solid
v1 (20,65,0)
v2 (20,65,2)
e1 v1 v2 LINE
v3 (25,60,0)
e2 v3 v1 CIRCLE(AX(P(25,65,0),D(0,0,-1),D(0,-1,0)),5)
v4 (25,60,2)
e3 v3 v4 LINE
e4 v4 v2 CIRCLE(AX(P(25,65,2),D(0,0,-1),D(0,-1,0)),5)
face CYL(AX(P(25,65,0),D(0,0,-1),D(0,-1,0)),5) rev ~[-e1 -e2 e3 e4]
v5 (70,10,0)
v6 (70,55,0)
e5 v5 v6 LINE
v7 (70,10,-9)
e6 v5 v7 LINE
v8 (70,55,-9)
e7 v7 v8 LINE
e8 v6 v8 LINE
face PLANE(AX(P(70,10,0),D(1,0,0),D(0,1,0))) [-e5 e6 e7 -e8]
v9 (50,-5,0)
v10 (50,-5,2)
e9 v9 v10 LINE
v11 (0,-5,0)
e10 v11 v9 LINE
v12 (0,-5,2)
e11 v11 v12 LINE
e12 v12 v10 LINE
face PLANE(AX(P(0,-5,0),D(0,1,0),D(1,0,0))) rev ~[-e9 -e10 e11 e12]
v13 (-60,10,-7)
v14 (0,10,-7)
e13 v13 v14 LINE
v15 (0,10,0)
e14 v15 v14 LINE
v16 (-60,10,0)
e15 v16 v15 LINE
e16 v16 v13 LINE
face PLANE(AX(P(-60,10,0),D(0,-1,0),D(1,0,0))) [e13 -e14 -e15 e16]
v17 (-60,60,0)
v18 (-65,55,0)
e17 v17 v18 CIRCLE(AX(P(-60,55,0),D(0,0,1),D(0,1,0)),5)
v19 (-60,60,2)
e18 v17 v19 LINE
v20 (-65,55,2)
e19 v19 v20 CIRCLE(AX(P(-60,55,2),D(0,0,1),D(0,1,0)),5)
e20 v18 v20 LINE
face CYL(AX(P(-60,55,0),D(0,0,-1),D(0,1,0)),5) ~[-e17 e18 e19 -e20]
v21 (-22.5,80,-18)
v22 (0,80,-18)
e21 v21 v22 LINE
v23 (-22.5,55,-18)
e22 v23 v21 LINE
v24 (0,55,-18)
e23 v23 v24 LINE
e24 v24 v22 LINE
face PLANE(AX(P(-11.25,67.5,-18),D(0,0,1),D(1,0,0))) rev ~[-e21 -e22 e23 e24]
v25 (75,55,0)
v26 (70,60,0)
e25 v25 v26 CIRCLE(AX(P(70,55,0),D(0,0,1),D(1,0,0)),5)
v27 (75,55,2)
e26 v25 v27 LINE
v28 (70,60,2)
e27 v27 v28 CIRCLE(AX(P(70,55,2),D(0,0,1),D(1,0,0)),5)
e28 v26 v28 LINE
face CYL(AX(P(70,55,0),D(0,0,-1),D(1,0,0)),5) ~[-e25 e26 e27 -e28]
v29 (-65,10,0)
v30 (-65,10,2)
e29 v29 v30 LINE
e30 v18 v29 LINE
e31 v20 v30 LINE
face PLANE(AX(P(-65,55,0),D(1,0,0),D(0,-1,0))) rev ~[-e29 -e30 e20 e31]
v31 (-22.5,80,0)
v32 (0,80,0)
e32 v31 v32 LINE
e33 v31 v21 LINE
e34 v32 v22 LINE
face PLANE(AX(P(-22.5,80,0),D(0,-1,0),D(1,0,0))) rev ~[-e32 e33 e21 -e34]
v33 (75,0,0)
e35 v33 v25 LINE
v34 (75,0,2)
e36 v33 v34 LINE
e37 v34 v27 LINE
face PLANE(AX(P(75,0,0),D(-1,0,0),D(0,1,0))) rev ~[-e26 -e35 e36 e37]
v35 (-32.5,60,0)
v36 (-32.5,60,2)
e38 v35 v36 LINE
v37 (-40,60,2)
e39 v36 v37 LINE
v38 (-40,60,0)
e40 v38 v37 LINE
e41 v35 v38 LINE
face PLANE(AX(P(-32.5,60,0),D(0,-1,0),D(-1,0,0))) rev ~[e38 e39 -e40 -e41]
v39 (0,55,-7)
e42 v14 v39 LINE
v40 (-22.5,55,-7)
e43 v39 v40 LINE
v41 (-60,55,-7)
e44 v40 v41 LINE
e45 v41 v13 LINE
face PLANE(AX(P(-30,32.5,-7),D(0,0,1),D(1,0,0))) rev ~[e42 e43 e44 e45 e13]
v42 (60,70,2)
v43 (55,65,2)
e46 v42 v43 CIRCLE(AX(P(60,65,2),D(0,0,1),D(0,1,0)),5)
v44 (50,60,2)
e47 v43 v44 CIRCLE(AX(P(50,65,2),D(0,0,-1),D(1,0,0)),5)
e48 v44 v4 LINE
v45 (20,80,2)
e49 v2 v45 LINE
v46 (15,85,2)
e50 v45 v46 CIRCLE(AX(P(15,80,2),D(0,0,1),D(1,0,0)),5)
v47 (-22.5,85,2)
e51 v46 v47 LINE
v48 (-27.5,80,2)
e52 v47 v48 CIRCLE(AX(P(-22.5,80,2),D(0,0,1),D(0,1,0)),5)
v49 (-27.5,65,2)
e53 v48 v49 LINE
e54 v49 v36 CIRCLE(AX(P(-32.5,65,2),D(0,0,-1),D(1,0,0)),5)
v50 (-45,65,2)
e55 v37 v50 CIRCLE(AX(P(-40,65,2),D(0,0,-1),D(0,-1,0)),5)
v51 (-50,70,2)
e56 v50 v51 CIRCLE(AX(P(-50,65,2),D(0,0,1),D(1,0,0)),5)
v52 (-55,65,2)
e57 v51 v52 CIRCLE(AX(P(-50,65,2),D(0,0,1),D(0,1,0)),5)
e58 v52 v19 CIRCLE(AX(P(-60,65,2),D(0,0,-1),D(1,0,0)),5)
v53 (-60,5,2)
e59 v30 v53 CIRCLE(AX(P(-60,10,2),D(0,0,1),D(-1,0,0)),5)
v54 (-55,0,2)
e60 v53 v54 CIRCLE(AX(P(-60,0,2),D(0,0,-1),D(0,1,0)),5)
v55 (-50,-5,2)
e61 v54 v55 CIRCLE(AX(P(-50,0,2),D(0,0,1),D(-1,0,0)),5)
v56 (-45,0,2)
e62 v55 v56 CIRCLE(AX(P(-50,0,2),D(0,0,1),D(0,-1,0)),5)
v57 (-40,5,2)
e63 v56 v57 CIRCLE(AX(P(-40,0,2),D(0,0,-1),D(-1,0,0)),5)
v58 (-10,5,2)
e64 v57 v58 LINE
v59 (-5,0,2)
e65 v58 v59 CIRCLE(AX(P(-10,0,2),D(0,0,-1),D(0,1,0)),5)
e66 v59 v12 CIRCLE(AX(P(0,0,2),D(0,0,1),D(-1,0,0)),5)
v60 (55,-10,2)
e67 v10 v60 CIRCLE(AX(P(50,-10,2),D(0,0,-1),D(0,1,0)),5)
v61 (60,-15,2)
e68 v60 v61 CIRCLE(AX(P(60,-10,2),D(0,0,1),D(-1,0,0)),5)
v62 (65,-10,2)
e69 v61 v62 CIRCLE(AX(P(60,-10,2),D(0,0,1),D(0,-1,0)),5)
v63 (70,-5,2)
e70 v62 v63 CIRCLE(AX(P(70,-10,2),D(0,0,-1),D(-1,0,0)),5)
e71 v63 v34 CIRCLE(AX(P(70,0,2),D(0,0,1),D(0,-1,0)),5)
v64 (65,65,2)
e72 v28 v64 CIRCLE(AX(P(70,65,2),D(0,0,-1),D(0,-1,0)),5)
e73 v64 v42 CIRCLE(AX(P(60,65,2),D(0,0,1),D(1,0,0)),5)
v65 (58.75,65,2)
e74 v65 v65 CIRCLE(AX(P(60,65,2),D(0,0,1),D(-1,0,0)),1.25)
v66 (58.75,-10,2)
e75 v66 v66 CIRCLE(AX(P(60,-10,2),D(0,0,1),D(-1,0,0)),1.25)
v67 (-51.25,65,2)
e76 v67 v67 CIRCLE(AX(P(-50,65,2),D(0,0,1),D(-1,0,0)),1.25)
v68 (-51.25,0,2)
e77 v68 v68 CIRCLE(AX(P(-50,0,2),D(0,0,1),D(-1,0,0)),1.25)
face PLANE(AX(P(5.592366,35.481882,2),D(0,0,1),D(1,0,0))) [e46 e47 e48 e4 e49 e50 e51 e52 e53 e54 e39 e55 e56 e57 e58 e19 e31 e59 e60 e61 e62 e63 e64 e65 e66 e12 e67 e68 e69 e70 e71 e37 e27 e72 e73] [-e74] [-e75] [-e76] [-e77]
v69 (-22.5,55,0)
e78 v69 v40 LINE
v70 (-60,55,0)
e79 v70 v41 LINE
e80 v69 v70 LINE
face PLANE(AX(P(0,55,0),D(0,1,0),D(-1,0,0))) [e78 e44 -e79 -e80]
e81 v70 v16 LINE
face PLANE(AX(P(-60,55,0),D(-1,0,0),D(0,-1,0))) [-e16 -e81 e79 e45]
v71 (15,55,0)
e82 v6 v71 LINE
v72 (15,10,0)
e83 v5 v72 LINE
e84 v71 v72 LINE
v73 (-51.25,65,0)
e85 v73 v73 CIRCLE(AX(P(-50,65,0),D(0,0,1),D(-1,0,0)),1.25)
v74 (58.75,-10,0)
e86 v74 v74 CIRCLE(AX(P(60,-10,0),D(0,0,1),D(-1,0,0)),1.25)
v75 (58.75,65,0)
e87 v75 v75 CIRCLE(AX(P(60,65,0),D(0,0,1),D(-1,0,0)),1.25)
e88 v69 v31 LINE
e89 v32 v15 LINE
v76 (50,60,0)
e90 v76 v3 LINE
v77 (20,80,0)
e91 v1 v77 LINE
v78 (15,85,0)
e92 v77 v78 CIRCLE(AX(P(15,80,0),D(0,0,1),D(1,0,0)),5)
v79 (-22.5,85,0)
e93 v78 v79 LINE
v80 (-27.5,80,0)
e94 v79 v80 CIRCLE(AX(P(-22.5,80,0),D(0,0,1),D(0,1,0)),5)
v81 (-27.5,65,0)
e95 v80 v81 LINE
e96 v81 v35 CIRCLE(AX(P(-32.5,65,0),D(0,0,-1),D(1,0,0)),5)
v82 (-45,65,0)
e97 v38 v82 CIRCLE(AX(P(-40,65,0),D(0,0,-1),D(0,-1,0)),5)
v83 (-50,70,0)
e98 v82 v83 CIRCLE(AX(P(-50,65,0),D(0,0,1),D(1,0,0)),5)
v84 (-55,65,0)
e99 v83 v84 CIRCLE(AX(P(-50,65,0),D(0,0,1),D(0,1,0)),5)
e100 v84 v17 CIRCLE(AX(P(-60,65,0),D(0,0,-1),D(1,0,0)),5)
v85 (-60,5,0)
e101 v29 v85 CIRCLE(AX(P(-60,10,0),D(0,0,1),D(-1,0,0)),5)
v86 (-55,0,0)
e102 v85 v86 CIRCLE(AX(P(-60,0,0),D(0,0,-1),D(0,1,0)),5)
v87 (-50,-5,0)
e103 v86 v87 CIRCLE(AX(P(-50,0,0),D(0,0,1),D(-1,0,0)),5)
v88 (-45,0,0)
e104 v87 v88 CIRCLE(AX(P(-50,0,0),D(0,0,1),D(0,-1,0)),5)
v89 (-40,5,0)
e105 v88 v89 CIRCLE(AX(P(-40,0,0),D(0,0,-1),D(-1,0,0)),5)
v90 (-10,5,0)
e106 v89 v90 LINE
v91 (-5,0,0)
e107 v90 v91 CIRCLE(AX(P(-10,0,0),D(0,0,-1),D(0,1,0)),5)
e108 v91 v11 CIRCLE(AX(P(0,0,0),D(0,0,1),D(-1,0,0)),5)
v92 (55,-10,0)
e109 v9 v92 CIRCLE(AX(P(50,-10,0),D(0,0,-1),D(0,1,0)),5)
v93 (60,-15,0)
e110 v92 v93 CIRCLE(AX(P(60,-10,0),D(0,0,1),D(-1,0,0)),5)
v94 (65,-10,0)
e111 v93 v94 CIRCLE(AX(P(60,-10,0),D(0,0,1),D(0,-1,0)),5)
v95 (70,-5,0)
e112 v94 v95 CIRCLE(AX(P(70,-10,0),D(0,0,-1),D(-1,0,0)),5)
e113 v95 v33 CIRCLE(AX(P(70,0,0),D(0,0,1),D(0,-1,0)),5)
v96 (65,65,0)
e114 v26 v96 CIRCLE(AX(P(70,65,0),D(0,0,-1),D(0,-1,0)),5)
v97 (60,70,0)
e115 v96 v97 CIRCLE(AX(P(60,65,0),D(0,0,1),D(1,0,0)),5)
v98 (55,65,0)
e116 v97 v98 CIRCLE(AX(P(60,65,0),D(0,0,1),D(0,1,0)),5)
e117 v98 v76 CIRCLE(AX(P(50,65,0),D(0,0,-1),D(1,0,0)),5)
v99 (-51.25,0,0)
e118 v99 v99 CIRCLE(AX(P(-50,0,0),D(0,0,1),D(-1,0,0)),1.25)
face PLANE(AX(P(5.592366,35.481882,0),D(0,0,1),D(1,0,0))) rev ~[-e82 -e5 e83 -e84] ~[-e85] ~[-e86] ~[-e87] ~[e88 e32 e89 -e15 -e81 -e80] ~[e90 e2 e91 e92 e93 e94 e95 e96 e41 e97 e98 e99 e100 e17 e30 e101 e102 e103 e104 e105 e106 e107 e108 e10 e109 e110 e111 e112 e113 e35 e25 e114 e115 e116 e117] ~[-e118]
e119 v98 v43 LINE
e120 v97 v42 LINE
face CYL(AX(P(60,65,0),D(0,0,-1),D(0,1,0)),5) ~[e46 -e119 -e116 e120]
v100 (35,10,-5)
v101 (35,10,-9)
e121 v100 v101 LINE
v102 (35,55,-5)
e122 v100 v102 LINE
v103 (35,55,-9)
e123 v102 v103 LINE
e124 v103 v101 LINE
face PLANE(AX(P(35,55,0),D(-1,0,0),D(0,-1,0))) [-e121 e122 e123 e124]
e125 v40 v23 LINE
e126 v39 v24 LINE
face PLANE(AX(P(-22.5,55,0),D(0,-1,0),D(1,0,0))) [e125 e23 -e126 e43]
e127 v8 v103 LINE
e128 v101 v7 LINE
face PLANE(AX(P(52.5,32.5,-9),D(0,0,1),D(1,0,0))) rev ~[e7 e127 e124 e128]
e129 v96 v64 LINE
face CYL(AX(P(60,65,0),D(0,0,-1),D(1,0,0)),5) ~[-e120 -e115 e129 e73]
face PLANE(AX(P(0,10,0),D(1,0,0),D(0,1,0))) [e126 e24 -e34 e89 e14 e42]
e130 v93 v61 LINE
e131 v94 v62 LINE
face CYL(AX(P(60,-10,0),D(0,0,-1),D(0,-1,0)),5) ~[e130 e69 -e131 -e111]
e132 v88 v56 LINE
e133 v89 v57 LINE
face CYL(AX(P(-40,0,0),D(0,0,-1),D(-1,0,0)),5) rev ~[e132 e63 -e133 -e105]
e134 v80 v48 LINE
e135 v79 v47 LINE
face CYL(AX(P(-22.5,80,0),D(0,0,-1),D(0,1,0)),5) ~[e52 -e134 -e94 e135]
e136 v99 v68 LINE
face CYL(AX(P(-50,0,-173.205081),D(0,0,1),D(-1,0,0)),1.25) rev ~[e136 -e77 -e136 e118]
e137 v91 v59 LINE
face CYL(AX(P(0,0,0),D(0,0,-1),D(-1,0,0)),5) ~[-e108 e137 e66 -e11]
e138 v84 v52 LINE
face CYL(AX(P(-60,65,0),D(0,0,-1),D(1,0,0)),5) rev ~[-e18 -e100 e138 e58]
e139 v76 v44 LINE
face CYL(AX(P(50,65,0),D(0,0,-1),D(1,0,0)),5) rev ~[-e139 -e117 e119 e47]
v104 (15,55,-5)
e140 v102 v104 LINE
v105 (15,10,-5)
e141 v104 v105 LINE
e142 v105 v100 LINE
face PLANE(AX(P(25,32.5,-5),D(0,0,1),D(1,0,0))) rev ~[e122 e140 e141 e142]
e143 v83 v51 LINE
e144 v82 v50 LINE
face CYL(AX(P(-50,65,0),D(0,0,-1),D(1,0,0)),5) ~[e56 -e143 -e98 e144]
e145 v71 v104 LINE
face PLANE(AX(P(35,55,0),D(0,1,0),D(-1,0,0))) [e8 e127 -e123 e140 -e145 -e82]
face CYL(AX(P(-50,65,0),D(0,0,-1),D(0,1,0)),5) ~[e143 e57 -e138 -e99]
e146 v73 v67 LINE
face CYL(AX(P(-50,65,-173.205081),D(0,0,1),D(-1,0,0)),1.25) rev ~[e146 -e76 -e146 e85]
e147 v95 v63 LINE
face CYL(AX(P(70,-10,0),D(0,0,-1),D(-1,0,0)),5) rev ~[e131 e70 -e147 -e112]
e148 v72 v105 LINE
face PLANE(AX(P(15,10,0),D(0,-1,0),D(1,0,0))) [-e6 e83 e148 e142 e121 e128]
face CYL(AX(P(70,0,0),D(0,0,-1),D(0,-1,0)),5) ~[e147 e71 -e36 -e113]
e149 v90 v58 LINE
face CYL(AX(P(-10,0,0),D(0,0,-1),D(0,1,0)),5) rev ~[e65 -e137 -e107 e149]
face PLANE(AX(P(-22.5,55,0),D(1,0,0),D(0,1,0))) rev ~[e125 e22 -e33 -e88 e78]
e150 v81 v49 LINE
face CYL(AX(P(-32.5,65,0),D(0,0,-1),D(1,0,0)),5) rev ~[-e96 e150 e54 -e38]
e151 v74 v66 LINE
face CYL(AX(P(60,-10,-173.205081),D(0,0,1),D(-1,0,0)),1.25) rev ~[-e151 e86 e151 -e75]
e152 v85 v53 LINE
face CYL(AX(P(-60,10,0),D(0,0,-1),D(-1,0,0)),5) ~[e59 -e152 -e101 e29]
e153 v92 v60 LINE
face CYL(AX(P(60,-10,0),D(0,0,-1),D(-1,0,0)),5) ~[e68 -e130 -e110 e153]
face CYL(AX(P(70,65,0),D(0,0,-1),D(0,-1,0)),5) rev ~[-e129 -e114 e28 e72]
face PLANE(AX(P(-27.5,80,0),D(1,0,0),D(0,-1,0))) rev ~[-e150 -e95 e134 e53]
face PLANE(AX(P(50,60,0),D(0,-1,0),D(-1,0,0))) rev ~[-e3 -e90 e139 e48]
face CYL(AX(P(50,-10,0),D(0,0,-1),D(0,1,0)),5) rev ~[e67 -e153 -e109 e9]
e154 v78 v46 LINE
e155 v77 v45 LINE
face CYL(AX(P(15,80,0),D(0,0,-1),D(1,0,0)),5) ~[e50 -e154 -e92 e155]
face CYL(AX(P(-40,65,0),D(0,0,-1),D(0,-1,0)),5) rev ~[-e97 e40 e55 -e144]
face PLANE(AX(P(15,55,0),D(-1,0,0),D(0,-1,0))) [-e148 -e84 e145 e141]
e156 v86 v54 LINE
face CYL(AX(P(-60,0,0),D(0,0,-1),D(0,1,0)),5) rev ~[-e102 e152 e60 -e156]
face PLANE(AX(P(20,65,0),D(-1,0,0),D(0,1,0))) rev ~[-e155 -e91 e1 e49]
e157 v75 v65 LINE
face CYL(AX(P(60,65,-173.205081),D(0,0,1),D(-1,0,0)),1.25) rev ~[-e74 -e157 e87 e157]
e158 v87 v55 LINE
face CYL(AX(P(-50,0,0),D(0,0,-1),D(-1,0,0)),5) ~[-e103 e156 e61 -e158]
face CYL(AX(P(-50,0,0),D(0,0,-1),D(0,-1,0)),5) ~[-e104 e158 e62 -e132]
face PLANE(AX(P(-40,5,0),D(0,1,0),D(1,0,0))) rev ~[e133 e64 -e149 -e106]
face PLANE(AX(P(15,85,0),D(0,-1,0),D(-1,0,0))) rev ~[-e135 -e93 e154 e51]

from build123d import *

# Parameters (mm, degrees)
F2_DEPTH = 2
F3_DEPTH = 9
F4_DEPTH = 5
F0_W     = 22.5
F0_H     = 25
F5_DEPTH = 18
F6_DEPTH = 7
F7_D     = 2.5


with BuildPart() as f2:
    # F1 (on Top) → F2 (new body)
    with BuildSketch(Plane.XY):
        with BuildLine():
            ThreePointArc((70, -5), (73.5355339059, -3.5355339059), (75, 0))
            Line((75, 0), (75, 55))
            ThreePointArc((75, 55), (73.5355339059, 58.5355339059), (70, 60))
            ThreePointArc((70, 60), (66.4644660941, 61.4644660941), (65, 65))
            ThreePointArc((65, 65), (63.5355339059, 68.5355339059), (60, 70))
            ThreePointArc((60, 70), (56.4644660941, 68.5355339059), (55, 65))
            ThreePointArc((55, 65), (53.5355339059, 61.4644660941), (50, 60))
            Line((50, 60), (25, 60))
            ThreePointArc((25, 60), (21.4644660941, 61.4644660941), (20, 65))
            Line((20, 65), (20, 80))
            ThreePointArc((20, 80), (18.5355339059, 83.5355339059), (15, 85))
            Line((15, 85), (-22.5, 85))
            ThreePointArc((-22.5, 85), (-26.0355339059, 83.5355339059), (-27.5, 80))
            Line((-27.5, 80), (-27.5, 65))
            ThreePointArc((-27.5, 65), (-28.9644660941, 61.4644660941), (-32.5, 60))
            Line((-32.5, 60), (-40, 60))
            ThreePointArc((-40, 60), (-43.5355339059, 61.4644660941), (-45, 65))
            ThreePointArc((-45, 65), (-46.4644660941, 68.5355339059), (-50, 70))
            ThreePointArc((-50, 70), (-53.5355339059, 68.5355339059), (-55, 65))
            ThreePointArc((-55, 65), (-56.4644660941, 61.4644660941), (-60, 60))
            ThreePointArc((-60, 60), (-63.5355339059, 58.5355339059), (-65, 55))
            Line((-65, 55), (-65, 10))
            ThreePointArc((-65, 10), (-63.5355339059, 6.4644660941), (-60, 5))
            ThreePointArc((-60, 5), (-56.4644660941, 3.5355339059), (-55, 0))
            ThreePointArc((-55, 0), (-53.5355339059, -3.5355339059), (-50, -5))
            ThreePointArc((-50, -5), (-46.4644660941, -3.5355339059), (-45, 0))
            ThreePointArc((-45, 0), (-43.5355339059, 3.5355339059), (-40, 5))
            Line((-40, 5), (-10, 5))
            ThreePointArc((-10, 5), (-6.4644660941, 3.5355339059), (-5, 0))
            ThreePointArc((-5, 0), (-3.5355339059, -3.5355339059), (0, -5))
            Line((0, -5), (50, -5))
            ThreePointArc((50, -5), (53.5355339059, -6.4644660941), (55, -10))
            ThreePointArc((55, -10), (56.4644660941, -13.5355339059), (60, -15))
            ThreePointArc((60, -15), (63.5355339059, -13.5355339059), (65, -10))
            ThreePointArc((65, -10), (66.4644660941, -6.4644660941), (70, -5))
        make_face()
        Polygon((-22.5, 55), (-22.5, 80), (15, 80), (15, 55), (70, 55), (70, 0), (0, 0), (0, 10), (-60, 10), (-60, 55), align=None, mode=Mode.SUBTRACT)
        Polygon((15, 80), (-22.5, 80), (-22.5, 55), (-60, 55), (-60, 10), (0, 10), (0, 0), (70, 0), (70, 55), (15, 55), align=None)
    extrude(amount=F2_DEPTH)

    # F0 (on Top) → F3 (join)
    with BuildSketch(Plane.XY):
        Polygon((35, 55), (35, 10), (70, 10), (70, 55), (40, 55), align=None)
    extrude(amount=-F3_DEPTH)

    # F0 (on Top) → F4 (join)
    with BuildSketch(Plane.XY):
        Polygon((15, 40), (15, 10), (35, 10), (35, 55), (15, 55), align=None)
    extrude(amount=-F4_DEPTH)

    # F0 (on Top) → F5 (join)
    with BuildSketch(Plane.XY):
        with Locations((-11.25, 67.5)):
            Rectangle(F0_W, F0_H)
    extrude(amount=-F5_DEPTH)

    # F0 (on Top) → F6 (join)
    with BuildSketch(Plane.XY):
        Polygon((-60, 10), (0, 10), (0, 40), (0, 55), (-22.5, 55), (-60, 55), align=None)
    extrude(amount=-F6_DEPTH)

    # F7 (through all)
    with Locations(Plane(origin=(0, 0, 0), x_dir=(1, 0, 0), z_dir=(0, 0, -1))):
        with Locations((60, -65), (-50, -65), (-50, 0), (60, 10)):
            Hole(F7_D / 2)


solid = f2.part
